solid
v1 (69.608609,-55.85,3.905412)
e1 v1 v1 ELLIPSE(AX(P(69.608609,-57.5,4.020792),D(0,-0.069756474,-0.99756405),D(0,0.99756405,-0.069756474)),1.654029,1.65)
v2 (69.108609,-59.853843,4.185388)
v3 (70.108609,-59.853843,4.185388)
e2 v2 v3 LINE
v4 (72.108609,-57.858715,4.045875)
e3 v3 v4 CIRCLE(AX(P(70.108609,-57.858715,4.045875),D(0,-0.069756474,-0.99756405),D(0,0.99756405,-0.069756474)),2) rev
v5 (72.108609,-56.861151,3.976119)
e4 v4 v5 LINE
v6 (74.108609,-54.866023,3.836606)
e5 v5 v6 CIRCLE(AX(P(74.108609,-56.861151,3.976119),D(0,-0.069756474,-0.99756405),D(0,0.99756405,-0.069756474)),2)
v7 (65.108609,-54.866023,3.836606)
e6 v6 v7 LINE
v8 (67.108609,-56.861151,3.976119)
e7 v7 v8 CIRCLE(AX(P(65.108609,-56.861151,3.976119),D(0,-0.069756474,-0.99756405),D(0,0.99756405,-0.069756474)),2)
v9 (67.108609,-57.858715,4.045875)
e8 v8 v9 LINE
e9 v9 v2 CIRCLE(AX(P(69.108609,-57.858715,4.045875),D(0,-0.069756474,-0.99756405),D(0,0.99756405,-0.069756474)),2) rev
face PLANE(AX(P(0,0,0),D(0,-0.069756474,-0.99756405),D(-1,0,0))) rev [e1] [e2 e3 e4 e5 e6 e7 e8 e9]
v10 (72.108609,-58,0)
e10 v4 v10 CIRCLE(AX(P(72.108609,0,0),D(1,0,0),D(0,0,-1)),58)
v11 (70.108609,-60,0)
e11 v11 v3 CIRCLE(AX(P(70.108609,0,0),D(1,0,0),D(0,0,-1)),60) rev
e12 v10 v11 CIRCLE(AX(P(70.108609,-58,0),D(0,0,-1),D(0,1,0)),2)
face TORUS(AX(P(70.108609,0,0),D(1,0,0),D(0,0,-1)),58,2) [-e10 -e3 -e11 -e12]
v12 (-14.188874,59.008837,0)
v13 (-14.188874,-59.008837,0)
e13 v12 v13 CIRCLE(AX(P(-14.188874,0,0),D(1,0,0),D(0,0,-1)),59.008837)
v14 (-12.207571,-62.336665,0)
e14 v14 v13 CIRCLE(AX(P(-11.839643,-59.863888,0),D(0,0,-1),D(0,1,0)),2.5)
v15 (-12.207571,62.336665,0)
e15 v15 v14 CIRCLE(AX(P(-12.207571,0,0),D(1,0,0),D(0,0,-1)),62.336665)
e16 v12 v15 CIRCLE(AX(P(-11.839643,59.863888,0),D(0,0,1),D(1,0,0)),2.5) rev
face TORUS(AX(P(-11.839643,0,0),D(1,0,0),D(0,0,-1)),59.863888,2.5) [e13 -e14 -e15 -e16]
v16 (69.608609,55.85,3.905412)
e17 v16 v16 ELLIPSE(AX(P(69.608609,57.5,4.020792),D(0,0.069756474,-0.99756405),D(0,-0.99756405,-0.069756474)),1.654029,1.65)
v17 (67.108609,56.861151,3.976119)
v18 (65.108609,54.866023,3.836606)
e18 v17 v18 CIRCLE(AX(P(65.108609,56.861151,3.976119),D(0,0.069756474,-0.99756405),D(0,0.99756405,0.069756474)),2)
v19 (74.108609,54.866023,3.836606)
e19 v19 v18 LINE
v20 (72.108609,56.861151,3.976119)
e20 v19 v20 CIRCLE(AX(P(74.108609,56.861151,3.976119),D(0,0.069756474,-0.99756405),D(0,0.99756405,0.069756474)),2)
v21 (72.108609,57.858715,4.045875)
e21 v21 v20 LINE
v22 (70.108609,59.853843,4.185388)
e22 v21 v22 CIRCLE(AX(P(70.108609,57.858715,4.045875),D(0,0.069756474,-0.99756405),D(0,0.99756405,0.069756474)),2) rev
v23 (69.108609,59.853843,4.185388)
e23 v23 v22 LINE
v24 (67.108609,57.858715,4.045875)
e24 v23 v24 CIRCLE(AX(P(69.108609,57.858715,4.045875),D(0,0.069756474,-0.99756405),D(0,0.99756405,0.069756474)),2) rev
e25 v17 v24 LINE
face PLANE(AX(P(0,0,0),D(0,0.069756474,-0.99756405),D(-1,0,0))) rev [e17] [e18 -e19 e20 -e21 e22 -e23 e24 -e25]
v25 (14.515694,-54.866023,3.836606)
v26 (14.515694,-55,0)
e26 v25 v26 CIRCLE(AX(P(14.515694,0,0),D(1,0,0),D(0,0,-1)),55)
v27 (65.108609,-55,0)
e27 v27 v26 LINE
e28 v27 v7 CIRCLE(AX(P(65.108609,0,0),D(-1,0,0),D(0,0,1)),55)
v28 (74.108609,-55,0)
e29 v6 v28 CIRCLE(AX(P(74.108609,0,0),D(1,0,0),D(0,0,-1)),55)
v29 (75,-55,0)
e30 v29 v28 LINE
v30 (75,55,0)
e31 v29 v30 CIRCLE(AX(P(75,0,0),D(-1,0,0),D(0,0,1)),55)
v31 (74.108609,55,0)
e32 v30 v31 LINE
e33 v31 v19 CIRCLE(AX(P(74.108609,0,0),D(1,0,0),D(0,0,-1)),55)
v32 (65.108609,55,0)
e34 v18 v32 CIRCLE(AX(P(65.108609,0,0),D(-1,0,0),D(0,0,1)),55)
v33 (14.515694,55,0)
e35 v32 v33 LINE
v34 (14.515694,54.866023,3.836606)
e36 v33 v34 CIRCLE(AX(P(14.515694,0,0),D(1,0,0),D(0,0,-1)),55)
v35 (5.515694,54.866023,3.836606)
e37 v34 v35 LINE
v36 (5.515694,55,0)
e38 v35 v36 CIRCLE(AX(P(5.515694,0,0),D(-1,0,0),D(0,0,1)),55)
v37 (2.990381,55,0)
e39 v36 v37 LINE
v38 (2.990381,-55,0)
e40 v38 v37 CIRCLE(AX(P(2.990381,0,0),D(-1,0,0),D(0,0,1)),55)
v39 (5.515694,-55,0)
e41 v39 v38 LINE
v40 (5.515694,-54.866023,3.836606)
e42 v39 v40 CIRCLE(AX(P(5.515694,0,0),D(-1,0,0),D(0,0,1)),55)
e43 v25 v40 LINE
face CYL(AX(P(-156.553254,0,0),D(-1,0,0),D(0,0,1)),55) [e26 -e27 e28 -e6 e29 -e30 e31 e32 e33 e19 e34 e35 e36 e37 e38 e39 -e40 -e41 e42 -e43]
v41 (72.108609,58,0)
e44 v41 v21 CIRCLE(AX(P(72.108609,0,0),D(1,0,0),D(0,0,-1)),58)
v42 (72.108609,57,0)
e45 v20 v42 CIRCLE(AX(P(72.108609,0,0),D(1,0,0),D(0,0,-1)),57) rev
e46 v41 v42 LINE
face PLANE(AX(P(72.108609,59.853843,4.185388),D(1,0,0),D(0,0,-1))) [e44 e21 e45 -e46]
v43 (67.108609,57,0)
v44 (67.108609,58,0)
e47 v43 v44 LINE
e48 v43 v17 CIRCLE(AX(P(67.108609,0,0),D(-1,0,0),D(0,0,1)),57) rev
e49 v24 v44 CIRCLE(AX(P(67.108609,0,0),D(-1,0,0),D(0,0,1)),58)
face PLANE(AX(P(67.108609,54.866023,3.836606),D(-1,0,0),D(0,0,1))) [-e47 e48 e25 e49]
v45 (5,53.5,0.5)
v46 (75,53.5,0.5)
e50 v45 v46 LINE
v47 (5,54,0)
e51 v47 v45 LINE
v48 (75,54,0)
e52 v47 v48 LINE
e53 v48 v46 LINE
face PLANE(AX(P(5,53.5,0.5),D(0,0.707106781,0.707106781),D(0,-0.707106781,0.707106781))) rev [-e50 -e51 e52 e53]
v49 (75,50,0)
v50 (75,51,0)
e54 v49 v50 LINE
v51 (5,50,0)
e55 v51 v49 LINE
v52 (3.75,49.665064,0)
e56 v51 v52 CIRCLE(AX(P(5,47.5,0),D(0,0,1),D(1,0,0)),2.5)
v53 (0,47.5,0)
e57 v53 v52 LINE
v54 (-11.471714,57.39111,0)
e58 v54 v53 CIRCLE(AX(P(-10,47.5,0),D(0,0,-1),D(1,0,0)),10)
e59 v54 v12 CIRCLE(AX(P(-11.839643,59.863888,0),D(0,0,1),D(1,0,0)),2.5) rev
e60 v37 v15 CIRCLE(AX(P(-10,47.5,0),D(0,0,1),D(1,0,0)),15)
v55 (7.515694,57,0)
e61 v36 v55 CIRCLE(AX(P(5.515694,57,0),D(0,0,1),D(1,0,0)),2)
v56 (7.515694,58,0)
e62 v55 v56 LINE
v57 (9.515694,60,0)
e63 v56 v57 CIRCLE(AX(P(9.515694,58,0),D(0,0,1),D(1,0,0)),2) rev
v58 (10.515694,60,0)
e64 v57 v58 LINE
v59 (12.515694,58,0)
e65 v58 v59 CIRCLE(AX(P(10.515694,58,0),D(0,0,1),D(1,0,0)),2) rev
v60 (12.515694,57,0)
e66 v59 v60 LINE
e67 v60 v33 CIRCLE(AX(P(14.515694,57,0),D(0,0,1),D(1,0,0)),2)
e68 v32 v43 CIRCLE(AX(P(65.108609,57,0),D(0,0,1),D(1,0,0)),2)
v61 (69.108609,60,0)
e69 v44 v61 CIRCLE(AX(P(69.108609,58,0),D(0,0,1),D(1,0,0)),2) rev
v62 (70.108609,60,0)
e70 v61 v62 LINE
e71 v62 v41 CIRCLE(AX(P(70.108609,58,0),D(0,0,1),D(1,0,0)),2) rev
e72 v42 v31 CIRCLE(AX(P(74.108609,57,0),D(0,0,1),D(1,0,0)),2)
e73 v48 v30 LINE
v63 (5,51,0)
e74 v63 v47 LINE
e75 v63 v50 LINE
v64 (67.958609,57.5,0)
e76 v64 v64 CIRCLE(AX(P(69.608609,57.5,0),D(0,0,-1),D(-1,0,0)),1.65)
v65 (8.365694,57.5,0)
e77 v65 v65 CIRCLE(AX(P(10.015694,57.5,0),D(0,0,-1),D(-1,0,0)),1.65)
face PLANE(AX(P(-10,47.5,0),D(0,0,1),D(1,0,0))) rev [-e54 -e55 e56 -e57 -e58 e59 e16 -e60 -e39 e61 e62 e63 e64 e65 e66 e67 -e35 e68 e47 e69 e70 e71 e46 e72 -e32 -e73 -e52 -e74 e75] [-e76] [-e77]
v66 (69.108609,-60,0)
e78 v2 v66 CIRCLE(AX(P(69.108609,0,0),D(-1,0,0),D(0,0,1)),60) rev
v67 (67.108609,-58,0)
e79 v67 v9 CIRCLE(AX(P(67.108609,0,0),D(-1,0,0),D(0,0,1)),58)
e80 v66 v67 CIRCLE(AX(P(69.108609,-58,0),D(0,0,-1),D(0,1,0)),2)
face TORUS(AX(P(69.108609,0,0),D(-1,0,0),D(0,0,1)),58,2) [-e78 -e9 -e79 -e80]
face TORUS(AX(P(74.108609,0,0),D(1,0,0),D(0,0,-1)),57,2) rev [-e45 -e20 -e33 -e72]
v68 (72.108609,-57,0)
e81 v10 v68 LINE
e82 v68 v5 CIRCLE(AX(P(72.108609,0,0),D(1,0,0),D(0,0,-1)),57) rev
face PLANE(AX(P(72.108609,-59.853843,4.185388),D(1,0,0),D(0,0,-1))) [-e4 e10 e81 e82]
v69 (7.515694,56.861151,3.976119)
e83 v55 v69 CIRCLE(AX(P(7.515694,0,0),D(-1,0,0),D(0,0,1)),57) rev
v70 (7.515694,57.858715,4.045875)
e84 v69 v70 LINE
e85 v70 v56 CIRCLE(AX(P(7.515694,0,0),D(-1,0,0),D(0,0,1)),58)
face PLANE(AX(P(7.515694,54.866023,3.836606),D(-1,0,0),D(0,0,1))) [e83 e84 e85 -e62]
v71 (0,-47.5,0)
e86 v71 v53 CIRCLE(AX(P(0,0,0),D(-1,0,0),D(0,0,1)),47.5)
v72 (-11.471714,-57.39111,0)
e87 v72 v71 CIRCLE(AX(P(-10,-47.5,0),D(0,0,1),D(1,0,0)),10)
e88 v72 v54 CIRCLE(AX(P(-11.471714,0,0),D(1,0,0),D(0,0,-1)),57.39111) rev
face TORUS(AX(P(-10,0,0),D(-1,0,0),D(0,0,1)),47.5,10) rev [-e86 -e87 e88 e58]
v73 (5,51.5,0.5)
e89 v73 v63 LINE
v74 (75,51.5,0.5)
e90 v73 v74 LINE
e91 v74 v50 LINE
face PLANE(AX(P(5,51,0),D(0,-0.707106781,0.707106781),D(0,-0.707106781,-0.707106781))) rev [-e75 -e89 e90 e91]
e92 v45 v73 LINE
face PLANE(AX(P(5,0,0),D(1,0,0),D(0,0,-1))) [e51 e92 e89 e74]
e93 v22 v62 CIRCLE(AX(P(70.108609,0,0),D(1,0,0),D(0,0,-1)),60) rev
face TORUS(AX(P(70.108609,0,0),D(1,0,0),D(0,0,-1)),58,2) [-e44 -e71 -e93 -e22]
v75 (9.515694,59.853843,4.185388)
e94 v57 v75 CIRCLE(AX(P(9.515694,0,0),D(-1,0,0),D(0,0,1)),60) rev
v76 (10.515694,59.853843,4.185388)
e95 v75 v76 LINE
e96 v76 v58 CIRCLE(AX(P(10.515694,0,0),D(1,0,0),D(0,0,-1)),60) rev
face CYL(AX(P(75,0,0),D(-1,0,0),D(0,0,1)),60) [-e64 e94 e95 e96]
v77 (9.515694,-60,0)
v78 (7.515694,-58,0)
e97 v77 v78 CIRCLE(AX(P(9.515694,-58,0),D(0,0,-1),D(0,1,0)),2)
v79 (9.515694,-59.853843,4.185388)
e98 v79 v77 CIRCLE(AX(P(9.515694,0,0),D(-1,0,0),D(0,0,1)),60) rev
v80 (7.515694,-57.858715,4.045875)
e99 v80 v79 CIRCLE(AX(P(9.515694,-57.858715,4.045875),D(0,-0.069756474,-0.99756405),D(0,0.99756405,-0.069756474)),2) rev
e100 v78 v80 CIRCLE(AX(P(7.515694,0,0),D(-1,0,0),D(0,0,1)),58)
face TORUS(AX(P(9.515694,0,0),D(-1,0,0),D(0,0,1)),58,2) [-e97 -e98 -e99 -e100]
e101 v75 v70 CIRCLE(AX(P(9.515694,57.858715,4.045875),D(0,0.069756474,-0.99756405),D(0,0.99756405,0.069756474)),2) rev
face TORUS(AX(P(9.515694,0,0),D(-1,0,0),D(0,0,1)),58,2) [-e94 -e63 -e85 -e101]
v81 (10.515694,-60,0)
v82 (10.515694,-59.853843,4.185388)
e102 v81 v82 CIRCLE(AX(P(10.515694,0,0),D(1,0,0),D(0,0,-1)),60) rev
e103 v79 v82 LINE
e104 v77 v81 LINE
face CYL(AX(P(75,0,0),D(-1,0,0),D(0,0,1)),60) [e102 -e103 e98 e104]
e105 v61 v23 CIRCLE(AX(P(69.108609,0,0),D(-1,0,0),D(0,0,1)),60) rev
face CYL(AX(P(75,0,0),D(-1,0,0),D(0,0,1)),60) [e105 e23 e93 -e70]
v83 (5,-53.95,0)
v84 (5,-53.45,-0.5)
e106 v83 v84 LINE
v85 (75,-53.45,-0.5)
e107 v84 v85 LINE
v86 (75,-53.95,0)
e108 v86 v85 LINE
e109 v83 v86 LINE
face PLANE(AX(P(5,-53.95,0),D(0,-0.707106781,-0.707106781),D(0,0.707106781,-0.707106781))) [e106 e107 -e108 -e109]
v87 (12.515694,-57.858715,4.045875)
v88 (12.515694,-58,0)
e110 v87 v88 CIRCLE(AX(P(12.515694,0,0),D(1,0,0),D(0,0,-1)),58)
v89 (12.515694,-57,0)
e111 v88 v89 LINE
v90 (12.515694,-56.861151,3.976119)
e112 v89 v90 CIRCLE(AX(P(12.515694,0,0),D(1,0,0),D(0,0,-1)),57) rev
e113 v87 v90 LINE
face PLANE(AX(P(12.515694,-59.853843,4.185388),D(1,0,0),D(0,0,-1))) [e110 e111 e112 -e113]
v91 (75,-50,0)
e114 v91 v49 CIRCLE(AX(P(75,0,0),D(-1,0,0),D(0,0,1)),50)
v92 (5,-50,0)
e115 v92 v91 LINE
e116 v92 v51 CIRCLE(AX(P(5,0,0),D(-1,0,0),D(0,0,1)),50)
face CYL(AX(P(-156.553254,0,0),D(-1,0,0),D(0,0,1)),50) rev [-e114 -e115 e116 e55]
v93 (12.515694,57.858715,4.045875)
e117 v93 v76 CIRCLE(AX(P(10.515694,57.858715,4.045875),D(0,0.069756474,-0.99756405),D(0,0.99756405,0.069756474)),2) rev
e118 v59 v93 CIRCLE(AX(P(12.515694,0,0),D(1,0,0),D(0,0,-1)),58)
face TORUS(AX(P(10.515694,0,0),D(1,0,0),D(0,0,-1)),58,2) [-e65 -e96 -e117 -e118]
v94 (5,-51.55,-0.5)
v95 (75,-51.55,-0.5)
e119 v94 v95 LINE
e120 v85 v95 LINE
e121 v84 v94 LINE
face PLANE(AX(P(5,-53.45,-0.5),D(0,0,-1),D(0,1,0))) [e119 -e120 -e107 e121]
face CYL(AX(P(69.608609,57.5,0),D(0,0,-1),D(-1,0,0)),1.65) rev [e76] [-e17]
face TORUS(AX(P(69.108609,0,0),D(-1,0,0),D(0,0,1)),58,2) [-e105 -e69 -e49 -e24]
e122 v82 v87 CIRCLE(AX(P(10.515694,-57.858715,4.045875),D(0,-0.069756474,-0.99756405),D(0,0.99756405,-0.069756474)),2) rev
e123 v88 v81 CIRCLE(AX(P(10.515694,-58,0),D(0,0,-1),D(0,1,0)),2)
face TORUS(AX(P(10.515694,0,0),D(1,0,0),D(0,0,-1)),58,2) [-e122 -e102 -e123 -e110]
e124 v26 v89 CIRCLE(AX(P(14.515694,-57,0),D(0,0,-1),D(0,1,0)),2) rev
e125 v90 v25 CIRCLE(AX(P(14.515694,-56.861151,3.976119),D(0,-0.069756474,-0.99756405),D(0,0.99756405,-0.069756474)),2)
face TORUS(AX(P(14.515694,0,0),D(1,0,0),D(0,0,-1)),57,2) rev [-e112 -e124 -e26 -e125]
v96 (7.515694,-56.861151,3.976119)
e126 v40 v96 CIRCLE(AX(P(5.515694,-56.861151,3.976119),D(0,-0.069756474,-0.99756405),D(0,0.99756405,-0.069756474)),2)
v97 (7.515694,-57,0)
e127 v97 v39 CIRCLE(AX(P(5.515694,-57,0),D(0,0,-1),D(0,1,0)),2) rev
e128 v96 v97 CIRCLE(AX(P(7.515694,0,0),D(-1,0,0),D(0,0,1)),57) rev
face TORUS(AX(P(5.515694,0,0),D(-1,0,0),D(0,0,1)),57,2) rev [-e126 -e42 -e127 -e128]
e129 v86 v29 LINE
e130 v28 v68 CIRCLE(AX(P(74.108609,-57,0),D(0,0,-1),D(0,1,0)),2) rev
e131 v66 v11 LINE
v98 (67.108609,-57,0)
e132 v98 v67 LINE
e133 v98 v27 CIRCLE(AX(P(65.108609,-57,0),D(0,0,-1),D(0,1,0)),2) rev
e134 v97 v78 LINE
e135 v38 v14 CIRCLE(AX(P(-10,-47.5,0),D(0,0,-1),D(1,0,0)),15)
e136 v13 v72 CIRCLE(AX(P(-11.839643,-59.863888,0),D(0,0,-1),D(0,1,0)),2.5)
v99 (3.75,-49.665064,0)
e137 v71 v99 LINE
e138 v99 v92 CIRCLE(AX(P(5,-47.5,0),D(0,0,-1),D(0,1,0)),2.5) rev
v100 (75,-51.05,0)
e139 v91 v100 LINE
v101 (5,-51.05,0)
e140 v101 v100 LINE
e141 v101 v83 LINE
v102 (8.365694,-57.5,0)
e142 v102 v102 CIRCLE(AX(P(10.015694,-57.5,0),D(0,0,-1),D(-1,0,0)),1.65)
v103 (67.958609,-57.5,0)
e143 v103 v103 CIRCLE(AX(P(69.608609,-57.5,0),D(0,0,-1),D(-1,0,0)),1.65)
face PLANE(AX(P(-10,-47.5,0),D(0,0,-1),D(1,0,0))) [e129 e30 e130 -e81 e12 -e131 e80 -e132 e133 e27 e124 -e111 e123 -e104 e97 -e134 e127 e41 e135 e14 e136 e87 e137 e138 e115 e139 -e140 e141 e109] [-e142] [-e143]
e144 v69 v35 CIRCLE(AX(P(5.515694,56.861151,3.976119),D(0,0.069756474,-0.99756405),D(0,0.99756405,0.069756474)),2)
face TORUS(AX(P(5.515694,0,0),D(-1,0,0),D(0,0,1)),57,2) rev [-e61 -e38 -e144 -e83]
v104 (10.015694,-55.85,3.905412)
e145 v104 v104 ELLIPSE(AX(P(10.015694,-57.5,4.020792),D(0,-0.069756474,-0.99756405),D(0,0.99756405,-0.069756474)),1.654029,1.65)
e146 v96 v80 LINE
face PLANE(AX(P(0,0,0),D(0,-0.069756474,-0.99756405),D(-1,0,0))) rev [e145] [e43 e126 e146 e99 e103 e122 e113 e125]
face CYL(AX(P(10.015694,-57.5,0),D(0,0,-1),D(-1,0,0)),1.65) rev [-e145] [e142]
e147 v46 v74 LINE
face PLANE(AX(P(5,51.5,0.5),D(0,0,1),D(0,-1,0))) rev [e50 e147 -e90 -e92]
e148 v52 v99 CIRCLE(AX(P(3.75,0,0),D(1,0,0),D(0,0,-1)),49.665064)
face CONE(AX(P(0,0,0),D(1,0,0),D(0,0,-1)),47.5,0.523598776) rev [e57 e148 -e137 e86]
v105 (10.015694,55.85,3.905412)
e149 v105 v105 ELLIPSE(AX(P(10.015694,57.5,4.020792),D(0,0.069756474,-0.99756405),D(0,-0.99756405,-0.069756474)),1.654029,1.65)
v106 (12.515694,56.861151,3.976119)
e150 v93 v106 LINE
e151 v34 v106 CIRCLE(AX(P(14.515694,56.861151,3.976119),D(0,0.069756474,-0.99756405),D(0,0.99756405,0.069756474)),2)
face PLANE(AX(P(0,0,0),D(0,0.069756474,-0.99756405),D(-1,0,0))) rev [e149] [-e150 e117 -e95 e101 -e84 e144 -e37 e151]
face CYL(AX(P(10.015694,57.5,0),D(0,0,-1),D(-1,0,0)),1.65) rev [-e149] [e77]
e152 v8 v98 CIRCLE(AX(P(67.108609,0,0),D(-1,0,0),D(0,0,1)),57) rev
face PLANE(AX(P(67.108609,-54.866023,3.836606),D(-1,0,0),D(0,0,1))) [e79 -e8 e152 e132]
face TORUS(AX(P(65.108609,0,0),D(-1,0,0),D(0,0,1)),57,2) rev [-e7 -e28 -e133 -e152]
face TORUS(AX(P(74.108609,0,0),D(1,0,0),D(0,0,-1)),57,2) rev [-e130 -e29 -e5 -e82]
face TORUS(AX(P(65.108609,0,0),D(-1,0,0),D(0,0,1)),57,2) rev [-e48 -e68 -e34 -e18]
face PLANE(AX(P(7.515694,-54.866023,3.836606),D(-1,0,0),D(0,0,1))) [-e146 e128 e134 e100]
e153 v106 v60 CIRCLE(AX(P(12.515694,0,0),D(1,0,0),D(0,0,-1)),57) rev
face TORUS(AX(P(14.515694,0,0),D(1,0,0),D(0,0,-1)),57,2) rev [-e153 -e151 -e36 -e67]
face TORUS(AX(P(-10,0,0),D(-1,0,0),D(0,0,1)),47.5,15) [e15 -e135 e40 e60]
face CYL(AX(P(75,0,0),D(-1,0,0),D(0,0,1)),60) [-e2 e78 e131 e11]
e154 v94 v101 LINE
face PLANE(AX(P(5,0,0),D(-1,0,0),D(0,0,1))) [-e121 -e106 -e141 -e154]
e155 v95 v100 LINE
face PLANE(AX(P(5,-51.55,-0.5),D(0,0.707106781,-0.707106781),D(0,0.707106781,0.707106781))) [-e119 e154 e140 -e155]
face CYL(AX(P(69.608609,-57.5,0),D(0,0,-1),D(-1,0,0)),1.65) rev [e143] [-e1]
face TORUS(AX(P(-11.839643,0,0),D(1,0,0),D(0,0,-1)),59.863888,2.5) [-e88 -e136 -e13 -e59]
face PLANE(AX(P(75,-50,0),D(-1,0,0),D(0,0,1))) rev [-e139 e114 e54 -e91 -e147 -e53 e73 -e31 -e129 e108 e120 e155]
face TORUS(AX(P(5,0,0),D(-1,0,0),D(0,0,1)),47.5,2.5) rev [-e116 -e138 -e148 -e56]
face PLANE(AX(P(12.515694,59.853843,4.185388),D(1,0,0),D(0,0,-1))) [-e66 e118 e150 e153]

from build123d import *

# Parameters (mm, degrees)
REVOLVE1_ANGLE                 = 180
FILLET1_R                      = 2.5
FILLET2_R                      = 2.5
CUT_EXTRUDE1_DEPTH             = 70
BOSS_EXTRUDE1_DEPTH            = 70
SKETCH7_W                      = 5
SKETCH7_H                      = 5
REVOLVE2_ANGLE                 = 4
F_3_0MM_DOWEL_HOLE2_AT_2_COUNT = 2
F_3_0MM_DOWEL_HOLE2_AT_2_PITCH = 59.592915104
FILLET3_R                      = 2
FILLET3_OF_MIRROR3_R           = 2


with BuildPart() as part:
    # Sketch1 → Revolve1 (revolve)
    with BuildSketch(Plane.XY):
        with BuildLine():
            Line((4.330127019, 50), (0, 47.5))
            ThreePointArc((0, 47.5), (-4.264235636, 55.691520443), (-13.420201433, 56.896926208))
            Line((-13.420201433, 56.896926208), (-15.13030215, 61.595389312))
            ThreePointArc((-15.13030215, 61.595389312), (-4.86969785, 61.595389312), (2.990381057, 55))
            Line((2.990381057, 55), (75, 55))
            Line((75, 55), (75, 50))
            Line((75, 50), (4.330127019, 50))
        make_face()
    revolve(axis=Axis((-156.553254438, 0, 0), (1, 0, 0)), revolution_arc=REVOLVE1_ANGLE)

    # Fillet1
    fillet1_edges = [part.edges().sort_by_distance(p)[0] for p in [
        (4.330127019, 0, 50),
    ]]
    fillet(fillet1_edges, radius=FILLET1_R)

    # Fillet2
    fillet2_edges = [part.edges().sort_by_distance(p)[0] for p in [
        (-15.13030215, 0, 61.595389312),
        (-13.420201433, 0, 56.896926208),
    ]]
    fillet(fillet2_edges, radius=FILLET2_R - 0.0001)  # a hair under: the kernel refuses the full size

    # Sketch3 → Cut-Extrude1 (cut)
    with BuildSketch(Plane(origin=(75, 0, 0), x_dir=(0, 0, -1), z_dir=(1, 0, 0))):
        Polygon((0, 54), (0, 51), (-0.5, 51.5), (-0.5, 53.5), align=None)
    extrude(amount=-CUT_EXTRUDE1_DEPTH, mode=Mode.SUBTRACT)

    # Sketch5 → Boss-Extrude1 (add)
    with BuildSketch(Plane(origin=(75, 0, 0), x_dir=(0, 0, -1), z_dir=(1, 0, 0))):
        Polygon((0, -51.05), (0, -53.95), (0.5, -53.45), (0.5, -51.55), align=None)
    extrude(amount=-BOSS_EXTRUDE1_DEPTH)

    # Sketch7 → Revolve2 (revolve)
    with BuildSketch(Plane(origin=(0, 0, 0), x_dir=(-1, 0, 0), z_dir=(0, 0, -1))):
        with Locations((-69.608609025, 57.5)):
            Rectangle(SKETCH7_W, SKETCH7_H)
        with Locations((-10.015693921, 57.5)):
            Rectangle(SKETCH7_W, SKETCH7_H)
    revolve2 = revolve(axis=Axis((75, 0, 0), (1, 0, 0)), revolution_arc=REVOLVE2_ANGLE)

    # Sketch11 → Ø3.0mm Dowel Hole2 (revolve, cut)
    with BuildSketch(Plane(origin=(69.608609025, 57.5, 0), x_dir=(0, 1, 0), z_dir=(1, 0, 0))):
        Polygon((0, 0), (0, 45.991420021), (1.65, 45), (1.65, 0), align=None)
    f_3_0mm_dowel_hole2 = revolve(axis=Axis((69.608609025, 57.5, -6.35), (0, 0, 1)), mode=Mode.SUBTRACT)

    # Ø3.0mm Dowel Hole2 at 2: Ø3.0mm Dowel Hole2 ×2
    with Locations(*[(-i * F_3_0MM_DOWEL_HOLE2_AT_2_PITCH, 0, 0) for i in range(1, F_3_0MM_DOWEL_HOLE2_AT_2_COUNT)]):
        add(f_3_0mm_dowel_hole2, mode=Mode.SUBTRACT)

    # Fillet3
    fillet3_edges = [part.edges().sort_by_distance(p)[0] for p in [
        (72.108609025, 54.966495486, 1.919472319),
        (67.108609025, 54.966495486, 1.919472319),
        (67.108609025, 59.963449621, 2.093969802),
        (72.108609025, 59.963449621, 2.093969802),
        (7.515693921, 54.966495486, 1.919472319),
        (7.515693921, 59.963449621, 2.093969802),
        (12.515693921, 59.963449621, 2.093969802),
        (12.515693921, 54.966495486, 1.919472319),
    ]]
    fillet(fillet3_edges, radius=FILLET3_R)

    # Mirror3: Revolve2, Ø3.0mm Dowel Hole2 across plane
    add(revolve2.mirror(Plane.ZX))
    add(f_3_0mm_dowel_hole2.mirror(Plane.ZX), mode=Mode.SUBTRACT)

    # Mirror3 copy 1 sketch → Mirror3 copy 1 (revolve, cut)
    with BuildSketch(Plane(origin=(10.015693921, -57.5, 0), x_dir=(0, -1, 0), z_dir=(1, 0, 0))):
        Polygon((0, 0), (0, -45.991420021), (1.65, -45), (1.65, 0), align=None)
    revolve(axis=Axis((10.015693921, -57.5, -6.35), (0, 0, -1)), mode=Mode.SUBTRACT)

    # Fillet3 of Mirror3
    fillet3_of_mirror3_edges = [part.edges().sort_by_distance(p)[0] for p in [
        (72.108609025, -54.966495486, 1.919472319),
        (67.108609025, -54.966495486, 1.919472319),
        (67.108609025, -59.963449621, 2.093969802),
        (72.108609025, -59.963449621, 2.093969802),
        (7.515693921, -54.966495486, 1.919472319),
        (7.515693921, -59.963449621, 2.093969802),
        (12.515693921, -59.963449621, 2.093969802),
        (12.515693921, -54.966495486, 1.919472319),
    ]]
    fillet(fillet3_of_mirror3_edges, radius=FILLET3_OF_MIRROR3_R)


solid = part.part
